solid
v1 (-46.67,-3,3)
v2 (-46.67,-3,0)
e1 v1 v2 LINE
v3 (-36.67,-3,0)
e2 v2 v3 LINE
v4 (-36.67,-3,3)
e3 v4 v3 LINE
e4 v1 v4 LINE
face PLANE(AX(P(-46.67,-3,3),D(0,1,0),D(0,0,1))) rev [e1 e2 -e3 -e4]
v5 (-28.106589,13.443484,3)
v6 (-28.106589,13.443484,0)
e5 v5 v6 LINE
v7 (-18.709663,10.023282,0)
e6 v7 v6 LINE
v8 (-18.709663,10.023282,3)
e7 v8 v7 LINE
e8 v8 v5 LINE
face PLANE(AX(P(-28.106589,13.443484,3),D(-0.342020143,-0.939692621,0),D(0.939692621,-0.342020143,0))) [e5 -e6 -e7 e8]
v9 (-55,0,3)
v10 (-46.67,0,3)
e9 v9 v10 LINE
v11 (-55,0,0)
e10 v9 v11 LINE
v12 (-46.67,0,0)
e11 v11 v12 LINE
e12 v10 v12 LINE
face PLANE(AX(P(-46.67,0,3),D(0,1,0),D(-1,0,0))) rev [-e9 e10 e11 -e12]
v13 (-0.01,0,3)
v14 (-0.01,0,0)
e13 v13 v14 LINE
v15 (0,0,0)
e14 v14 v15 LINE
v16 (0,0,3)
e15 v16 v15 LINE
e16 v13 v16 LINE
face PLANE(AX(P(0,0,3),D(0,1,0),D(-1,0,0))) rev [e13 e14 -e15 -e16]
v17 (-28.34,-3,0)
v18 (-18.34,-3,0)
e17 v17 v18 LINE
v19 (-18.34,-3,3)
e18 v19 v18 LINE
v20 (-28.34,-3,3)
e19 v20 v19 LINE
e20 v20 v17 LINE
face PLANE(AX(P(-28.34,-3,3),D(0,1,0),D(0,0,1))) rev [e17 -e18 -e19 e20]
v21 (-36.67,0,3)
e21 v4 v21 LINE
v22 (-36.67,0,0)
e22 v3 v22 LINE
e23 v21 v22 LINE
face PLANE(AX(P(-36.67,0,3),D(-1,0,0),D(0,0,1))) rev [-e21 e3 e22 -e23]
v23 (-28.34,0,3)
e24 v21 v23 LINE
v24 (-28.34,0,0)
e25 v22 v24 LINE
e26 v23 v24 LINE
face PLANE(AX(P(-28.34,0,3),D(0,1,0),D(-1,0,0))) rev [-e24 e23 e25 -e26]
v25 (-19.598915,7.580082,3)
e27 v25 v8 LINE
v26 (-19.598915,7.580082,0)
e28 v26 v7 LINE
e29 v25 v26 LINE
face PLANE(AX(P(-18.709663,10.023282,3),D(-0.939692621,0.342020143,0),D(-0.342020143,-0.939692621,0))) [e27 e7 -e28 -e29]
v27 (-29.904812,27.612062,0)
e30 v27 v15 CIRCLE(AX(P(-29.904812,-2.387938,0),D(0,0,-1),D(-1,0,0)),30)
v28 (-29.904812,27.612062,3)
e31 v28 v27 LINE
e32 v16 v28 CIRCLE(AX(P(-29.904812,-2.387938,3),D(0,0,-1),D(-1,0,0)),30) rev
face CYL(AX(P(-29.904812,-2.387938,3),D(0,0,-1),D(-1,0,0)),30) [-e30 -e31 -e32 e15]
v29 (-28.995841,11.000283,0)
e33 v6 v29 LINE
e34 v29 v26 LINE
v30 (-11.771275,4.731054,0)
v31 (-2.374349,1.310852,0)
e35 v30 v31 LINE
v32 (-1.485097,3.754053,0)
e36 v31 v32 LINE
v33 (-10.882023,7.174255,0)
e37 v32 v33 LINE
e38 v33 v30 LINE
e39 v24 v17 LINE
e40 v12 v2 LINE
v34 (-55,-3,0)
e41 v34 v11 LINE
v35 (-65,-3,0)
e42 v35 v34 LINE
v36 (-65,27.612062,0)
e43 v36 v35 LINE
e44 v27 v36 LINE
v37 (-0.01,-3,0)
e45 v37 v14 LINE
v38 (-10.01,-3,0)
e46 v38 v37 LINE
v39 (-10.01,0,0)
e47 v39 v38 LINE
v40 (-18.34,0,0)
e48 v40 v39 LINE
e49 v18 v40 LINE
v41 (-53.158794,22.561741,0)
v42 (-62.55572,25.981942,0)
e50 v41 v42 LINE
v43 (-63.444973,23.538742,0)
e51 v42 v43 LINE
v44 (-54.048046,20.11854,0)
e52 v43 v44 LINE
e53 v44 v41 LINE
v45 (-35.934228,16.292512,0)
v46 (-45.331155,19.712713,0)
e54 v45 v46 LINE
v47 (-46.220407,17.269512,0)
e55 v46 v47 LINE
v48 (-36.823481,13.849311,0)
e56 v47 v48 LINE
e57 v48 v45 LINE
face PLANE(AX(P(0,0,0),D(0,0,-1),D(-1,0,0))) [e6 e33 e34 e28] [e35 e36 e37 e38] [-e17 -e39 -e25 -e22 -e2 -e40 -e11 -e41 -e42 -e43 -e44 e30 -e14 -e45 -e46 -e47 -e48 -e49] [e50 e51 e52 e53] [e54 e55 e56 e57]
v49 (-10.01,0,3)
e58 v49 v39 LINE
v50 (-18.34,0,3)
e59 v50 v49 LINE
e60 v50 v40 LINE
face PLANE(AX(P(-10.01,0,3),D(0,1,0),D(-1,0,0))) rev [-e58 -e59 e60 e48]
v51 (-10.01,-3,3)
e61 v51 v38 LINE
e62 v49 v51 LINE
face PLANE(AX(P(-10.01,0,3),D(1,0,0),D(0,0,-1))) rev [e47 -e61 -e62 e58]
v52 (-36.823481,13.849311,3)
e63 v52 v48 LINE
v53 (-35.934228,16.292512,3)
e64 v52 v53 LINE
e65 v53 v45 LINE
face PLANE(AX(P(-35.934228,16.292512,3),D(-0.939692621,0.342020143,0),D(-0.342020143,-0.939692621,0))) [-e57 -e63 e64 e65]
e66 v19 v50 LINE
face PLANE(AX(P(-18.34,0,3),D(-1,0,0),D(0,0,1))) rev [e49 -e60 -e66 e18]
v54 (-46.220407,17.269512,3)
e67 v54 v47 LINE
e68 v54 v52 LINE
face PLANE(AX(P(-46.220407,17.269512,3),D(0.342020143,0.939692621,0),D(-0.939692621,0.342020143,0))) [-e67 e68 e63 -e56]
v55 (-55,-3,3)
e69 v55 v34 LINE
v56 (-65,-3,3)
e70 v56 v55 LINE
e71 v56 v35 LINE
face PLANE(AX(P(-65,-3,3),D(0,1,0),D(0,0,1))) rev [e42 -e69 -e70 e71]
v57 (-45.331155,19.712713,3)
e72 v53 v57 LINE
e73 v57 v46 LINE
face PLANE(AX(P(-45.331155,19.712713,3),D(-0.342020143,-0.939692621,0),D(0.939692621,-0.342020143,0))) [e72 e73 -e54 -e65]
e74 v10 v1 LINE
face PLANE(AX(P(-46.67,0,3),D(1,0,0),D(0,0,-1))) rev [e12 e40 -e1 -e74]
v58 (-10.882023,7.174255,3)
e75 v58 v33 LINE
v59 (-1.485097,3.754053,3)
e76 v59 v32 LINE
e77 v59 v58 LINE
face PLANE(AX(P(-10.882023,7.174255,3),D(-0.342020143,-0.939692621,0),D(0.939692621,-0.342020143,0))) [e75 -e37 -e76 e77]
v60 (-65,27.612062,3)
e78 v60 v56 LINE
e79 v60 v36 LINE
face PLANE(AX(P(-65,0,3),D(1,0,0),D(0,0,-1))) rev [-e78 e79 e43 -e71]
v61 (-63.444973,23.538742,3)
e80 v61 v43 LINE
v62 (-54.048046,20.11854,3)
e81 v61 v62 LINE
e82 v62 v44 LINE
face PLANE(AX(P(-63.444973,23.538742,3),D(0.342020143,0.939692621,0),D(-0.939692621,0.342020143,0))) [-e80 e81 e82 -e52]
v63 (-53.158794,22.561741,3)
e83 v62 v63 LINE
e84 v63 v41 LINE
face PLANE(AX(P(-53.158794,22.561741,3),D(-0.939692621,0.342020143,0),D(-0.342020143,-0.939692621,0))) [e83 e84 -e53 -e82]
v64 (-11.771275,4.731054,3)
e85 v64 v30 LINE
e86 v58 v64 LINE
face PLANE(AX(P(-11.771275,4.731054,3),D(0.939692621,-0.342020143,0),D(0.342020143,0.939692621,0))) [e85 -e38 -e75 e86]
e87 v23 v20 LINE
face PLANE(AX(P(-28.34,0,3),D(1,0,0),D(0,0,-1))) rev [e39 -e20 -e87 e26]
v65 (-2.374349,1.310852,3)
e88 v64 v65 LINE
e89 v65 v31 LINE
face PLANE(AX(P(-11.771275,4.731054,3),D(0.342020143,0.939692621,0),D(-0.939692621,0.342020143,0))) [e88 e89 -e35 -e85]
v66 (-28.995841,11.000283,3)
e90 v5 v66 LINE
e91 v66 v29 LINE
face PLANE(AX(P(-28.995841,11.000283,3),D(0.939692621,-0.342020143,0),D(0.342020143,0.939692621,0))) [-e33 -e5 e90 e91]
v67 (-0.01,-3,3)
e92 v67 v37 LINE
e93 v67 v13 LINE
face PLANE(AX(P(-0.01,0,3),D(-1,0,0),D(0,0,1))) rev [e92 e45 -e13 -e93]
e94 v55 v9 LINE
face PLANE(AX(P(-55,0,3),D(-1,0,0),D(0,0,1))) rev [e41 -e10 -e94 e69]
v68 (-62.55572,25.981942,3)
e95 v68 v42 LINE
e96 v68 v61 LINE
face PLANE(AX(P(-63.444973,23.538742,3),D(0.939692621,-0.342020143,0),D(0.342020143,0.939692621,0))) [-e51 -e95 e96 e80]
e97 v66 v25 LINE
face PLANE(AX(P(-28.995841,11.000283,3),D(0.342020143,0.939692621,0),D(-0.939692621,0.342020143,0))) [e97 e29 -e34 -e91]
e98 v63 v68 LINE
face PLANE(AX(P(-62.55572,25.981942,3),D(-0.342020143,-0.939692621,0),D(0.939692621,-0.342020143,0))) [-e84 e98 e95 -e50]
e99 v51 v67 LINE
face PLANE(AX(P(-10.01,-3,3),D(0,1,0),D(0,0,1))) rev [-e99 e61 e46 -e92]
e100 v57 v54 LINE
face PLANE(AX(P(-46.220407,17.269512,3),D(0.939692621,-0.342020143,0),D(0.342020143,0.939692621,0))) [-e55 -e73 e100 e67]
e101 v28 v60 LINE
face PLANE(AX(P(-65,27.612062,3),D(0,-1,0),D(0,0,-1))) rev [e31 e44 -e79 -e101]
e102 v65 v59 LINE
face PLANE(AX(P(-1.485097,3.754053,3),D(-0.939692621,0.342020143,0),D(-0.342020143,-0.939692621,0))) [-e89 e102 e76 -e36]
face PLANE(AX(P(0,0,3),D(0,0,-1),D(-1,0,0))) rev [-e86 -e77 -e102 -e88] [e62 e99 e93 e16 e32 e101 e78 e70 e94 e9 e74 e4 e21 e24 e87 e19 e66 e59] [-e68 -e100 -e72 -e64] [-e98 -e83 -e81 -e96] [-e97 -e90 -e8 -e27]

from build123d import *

# Parameters (mm, degrees)
BOSS_EXTRUDE1_DEPTH = 3
FILLET1_R           = 30


with BuildPart() as part:
    # Sketch1 → Boss-Extrude1 (new body)
    with BuildSketch(Plane.XY):
        Polygon((0, 0), (-0.01, 0), (-0.01, -3), (-10.01, -3), (-10.01, 0), (-18.34, 0), (-18.34, -3), (-28.34, -3), (-28.34, 0), (-36.67, 0), (-36.67, -3), (-46.67, -3), (-46.67, 0), (-55, 0), (-55, -3), (-65, -3), (-65, 0), (-65, 27.612062293), (0, 27.612062293), align=None)
        Polygon((-63.444972674, 23.538741566), (-62.555720301, 25.98194238), (-53.158794094, 22.561740947), (-54.048046466, 20.118540133), align=None, mode=Mode.SUBTRACT)
        Polygon((-45.331154562, 19.712713153), (-35.934228355, 16.29251172), (-36.823480727, 13.849310906), (-46.220406935, 17.269512339), align=None, mode=Mode.SUBTRACT)
        Polygon((-28.106588823, 13.443483926), (-18.709662616, 10.023282493), (-19.598914988, 7.580081679), (-28.995841196, 11.000283112), align=None, mode=Mode.SUBTRACT)
        Polygon((-10.882023084, 7.174254699), (-1.485096877, 3.754053266), (-2.374349249, 1.310852452), (-11.771275457, 4.731053885), align=None, mode=Mode.SUBTRACT)
    extrude(amount=BOSS_EXTRUDE1_DEPTH)

    # Fillet1
    # the kernel refuses this fillet: 30 mm, written as the material it takes off along each edge
    with BuildSketch(Plane(origin=(0, 27.612062293, -74.762028861), x_dir=(-1, 0, 0), z_dir=(0, 0, 1))) as fillet1_piece_1:
        with BuildLine():
            CenterArc((29.904811544, 30), FILLET1_R, 184.565454752, 85.434545248)
            Line((0, 27.612062293), (-0.598096231, 27.564303539))
            ThreePointArc((-0.598096231, 27.564303539), (-0.6, 13.806031146), (-0.6, 0))
            Line((-0.6, 0), (0, -0.6))
            Line((0, -0.6), (29.904811544, -0.6))
            Line((29.904811544, -0.6), (29.904811544, 0))
        make_face()
    extrude(amount=152.524057722, mode=Mode.SUBTRACT)


solid = part.part
